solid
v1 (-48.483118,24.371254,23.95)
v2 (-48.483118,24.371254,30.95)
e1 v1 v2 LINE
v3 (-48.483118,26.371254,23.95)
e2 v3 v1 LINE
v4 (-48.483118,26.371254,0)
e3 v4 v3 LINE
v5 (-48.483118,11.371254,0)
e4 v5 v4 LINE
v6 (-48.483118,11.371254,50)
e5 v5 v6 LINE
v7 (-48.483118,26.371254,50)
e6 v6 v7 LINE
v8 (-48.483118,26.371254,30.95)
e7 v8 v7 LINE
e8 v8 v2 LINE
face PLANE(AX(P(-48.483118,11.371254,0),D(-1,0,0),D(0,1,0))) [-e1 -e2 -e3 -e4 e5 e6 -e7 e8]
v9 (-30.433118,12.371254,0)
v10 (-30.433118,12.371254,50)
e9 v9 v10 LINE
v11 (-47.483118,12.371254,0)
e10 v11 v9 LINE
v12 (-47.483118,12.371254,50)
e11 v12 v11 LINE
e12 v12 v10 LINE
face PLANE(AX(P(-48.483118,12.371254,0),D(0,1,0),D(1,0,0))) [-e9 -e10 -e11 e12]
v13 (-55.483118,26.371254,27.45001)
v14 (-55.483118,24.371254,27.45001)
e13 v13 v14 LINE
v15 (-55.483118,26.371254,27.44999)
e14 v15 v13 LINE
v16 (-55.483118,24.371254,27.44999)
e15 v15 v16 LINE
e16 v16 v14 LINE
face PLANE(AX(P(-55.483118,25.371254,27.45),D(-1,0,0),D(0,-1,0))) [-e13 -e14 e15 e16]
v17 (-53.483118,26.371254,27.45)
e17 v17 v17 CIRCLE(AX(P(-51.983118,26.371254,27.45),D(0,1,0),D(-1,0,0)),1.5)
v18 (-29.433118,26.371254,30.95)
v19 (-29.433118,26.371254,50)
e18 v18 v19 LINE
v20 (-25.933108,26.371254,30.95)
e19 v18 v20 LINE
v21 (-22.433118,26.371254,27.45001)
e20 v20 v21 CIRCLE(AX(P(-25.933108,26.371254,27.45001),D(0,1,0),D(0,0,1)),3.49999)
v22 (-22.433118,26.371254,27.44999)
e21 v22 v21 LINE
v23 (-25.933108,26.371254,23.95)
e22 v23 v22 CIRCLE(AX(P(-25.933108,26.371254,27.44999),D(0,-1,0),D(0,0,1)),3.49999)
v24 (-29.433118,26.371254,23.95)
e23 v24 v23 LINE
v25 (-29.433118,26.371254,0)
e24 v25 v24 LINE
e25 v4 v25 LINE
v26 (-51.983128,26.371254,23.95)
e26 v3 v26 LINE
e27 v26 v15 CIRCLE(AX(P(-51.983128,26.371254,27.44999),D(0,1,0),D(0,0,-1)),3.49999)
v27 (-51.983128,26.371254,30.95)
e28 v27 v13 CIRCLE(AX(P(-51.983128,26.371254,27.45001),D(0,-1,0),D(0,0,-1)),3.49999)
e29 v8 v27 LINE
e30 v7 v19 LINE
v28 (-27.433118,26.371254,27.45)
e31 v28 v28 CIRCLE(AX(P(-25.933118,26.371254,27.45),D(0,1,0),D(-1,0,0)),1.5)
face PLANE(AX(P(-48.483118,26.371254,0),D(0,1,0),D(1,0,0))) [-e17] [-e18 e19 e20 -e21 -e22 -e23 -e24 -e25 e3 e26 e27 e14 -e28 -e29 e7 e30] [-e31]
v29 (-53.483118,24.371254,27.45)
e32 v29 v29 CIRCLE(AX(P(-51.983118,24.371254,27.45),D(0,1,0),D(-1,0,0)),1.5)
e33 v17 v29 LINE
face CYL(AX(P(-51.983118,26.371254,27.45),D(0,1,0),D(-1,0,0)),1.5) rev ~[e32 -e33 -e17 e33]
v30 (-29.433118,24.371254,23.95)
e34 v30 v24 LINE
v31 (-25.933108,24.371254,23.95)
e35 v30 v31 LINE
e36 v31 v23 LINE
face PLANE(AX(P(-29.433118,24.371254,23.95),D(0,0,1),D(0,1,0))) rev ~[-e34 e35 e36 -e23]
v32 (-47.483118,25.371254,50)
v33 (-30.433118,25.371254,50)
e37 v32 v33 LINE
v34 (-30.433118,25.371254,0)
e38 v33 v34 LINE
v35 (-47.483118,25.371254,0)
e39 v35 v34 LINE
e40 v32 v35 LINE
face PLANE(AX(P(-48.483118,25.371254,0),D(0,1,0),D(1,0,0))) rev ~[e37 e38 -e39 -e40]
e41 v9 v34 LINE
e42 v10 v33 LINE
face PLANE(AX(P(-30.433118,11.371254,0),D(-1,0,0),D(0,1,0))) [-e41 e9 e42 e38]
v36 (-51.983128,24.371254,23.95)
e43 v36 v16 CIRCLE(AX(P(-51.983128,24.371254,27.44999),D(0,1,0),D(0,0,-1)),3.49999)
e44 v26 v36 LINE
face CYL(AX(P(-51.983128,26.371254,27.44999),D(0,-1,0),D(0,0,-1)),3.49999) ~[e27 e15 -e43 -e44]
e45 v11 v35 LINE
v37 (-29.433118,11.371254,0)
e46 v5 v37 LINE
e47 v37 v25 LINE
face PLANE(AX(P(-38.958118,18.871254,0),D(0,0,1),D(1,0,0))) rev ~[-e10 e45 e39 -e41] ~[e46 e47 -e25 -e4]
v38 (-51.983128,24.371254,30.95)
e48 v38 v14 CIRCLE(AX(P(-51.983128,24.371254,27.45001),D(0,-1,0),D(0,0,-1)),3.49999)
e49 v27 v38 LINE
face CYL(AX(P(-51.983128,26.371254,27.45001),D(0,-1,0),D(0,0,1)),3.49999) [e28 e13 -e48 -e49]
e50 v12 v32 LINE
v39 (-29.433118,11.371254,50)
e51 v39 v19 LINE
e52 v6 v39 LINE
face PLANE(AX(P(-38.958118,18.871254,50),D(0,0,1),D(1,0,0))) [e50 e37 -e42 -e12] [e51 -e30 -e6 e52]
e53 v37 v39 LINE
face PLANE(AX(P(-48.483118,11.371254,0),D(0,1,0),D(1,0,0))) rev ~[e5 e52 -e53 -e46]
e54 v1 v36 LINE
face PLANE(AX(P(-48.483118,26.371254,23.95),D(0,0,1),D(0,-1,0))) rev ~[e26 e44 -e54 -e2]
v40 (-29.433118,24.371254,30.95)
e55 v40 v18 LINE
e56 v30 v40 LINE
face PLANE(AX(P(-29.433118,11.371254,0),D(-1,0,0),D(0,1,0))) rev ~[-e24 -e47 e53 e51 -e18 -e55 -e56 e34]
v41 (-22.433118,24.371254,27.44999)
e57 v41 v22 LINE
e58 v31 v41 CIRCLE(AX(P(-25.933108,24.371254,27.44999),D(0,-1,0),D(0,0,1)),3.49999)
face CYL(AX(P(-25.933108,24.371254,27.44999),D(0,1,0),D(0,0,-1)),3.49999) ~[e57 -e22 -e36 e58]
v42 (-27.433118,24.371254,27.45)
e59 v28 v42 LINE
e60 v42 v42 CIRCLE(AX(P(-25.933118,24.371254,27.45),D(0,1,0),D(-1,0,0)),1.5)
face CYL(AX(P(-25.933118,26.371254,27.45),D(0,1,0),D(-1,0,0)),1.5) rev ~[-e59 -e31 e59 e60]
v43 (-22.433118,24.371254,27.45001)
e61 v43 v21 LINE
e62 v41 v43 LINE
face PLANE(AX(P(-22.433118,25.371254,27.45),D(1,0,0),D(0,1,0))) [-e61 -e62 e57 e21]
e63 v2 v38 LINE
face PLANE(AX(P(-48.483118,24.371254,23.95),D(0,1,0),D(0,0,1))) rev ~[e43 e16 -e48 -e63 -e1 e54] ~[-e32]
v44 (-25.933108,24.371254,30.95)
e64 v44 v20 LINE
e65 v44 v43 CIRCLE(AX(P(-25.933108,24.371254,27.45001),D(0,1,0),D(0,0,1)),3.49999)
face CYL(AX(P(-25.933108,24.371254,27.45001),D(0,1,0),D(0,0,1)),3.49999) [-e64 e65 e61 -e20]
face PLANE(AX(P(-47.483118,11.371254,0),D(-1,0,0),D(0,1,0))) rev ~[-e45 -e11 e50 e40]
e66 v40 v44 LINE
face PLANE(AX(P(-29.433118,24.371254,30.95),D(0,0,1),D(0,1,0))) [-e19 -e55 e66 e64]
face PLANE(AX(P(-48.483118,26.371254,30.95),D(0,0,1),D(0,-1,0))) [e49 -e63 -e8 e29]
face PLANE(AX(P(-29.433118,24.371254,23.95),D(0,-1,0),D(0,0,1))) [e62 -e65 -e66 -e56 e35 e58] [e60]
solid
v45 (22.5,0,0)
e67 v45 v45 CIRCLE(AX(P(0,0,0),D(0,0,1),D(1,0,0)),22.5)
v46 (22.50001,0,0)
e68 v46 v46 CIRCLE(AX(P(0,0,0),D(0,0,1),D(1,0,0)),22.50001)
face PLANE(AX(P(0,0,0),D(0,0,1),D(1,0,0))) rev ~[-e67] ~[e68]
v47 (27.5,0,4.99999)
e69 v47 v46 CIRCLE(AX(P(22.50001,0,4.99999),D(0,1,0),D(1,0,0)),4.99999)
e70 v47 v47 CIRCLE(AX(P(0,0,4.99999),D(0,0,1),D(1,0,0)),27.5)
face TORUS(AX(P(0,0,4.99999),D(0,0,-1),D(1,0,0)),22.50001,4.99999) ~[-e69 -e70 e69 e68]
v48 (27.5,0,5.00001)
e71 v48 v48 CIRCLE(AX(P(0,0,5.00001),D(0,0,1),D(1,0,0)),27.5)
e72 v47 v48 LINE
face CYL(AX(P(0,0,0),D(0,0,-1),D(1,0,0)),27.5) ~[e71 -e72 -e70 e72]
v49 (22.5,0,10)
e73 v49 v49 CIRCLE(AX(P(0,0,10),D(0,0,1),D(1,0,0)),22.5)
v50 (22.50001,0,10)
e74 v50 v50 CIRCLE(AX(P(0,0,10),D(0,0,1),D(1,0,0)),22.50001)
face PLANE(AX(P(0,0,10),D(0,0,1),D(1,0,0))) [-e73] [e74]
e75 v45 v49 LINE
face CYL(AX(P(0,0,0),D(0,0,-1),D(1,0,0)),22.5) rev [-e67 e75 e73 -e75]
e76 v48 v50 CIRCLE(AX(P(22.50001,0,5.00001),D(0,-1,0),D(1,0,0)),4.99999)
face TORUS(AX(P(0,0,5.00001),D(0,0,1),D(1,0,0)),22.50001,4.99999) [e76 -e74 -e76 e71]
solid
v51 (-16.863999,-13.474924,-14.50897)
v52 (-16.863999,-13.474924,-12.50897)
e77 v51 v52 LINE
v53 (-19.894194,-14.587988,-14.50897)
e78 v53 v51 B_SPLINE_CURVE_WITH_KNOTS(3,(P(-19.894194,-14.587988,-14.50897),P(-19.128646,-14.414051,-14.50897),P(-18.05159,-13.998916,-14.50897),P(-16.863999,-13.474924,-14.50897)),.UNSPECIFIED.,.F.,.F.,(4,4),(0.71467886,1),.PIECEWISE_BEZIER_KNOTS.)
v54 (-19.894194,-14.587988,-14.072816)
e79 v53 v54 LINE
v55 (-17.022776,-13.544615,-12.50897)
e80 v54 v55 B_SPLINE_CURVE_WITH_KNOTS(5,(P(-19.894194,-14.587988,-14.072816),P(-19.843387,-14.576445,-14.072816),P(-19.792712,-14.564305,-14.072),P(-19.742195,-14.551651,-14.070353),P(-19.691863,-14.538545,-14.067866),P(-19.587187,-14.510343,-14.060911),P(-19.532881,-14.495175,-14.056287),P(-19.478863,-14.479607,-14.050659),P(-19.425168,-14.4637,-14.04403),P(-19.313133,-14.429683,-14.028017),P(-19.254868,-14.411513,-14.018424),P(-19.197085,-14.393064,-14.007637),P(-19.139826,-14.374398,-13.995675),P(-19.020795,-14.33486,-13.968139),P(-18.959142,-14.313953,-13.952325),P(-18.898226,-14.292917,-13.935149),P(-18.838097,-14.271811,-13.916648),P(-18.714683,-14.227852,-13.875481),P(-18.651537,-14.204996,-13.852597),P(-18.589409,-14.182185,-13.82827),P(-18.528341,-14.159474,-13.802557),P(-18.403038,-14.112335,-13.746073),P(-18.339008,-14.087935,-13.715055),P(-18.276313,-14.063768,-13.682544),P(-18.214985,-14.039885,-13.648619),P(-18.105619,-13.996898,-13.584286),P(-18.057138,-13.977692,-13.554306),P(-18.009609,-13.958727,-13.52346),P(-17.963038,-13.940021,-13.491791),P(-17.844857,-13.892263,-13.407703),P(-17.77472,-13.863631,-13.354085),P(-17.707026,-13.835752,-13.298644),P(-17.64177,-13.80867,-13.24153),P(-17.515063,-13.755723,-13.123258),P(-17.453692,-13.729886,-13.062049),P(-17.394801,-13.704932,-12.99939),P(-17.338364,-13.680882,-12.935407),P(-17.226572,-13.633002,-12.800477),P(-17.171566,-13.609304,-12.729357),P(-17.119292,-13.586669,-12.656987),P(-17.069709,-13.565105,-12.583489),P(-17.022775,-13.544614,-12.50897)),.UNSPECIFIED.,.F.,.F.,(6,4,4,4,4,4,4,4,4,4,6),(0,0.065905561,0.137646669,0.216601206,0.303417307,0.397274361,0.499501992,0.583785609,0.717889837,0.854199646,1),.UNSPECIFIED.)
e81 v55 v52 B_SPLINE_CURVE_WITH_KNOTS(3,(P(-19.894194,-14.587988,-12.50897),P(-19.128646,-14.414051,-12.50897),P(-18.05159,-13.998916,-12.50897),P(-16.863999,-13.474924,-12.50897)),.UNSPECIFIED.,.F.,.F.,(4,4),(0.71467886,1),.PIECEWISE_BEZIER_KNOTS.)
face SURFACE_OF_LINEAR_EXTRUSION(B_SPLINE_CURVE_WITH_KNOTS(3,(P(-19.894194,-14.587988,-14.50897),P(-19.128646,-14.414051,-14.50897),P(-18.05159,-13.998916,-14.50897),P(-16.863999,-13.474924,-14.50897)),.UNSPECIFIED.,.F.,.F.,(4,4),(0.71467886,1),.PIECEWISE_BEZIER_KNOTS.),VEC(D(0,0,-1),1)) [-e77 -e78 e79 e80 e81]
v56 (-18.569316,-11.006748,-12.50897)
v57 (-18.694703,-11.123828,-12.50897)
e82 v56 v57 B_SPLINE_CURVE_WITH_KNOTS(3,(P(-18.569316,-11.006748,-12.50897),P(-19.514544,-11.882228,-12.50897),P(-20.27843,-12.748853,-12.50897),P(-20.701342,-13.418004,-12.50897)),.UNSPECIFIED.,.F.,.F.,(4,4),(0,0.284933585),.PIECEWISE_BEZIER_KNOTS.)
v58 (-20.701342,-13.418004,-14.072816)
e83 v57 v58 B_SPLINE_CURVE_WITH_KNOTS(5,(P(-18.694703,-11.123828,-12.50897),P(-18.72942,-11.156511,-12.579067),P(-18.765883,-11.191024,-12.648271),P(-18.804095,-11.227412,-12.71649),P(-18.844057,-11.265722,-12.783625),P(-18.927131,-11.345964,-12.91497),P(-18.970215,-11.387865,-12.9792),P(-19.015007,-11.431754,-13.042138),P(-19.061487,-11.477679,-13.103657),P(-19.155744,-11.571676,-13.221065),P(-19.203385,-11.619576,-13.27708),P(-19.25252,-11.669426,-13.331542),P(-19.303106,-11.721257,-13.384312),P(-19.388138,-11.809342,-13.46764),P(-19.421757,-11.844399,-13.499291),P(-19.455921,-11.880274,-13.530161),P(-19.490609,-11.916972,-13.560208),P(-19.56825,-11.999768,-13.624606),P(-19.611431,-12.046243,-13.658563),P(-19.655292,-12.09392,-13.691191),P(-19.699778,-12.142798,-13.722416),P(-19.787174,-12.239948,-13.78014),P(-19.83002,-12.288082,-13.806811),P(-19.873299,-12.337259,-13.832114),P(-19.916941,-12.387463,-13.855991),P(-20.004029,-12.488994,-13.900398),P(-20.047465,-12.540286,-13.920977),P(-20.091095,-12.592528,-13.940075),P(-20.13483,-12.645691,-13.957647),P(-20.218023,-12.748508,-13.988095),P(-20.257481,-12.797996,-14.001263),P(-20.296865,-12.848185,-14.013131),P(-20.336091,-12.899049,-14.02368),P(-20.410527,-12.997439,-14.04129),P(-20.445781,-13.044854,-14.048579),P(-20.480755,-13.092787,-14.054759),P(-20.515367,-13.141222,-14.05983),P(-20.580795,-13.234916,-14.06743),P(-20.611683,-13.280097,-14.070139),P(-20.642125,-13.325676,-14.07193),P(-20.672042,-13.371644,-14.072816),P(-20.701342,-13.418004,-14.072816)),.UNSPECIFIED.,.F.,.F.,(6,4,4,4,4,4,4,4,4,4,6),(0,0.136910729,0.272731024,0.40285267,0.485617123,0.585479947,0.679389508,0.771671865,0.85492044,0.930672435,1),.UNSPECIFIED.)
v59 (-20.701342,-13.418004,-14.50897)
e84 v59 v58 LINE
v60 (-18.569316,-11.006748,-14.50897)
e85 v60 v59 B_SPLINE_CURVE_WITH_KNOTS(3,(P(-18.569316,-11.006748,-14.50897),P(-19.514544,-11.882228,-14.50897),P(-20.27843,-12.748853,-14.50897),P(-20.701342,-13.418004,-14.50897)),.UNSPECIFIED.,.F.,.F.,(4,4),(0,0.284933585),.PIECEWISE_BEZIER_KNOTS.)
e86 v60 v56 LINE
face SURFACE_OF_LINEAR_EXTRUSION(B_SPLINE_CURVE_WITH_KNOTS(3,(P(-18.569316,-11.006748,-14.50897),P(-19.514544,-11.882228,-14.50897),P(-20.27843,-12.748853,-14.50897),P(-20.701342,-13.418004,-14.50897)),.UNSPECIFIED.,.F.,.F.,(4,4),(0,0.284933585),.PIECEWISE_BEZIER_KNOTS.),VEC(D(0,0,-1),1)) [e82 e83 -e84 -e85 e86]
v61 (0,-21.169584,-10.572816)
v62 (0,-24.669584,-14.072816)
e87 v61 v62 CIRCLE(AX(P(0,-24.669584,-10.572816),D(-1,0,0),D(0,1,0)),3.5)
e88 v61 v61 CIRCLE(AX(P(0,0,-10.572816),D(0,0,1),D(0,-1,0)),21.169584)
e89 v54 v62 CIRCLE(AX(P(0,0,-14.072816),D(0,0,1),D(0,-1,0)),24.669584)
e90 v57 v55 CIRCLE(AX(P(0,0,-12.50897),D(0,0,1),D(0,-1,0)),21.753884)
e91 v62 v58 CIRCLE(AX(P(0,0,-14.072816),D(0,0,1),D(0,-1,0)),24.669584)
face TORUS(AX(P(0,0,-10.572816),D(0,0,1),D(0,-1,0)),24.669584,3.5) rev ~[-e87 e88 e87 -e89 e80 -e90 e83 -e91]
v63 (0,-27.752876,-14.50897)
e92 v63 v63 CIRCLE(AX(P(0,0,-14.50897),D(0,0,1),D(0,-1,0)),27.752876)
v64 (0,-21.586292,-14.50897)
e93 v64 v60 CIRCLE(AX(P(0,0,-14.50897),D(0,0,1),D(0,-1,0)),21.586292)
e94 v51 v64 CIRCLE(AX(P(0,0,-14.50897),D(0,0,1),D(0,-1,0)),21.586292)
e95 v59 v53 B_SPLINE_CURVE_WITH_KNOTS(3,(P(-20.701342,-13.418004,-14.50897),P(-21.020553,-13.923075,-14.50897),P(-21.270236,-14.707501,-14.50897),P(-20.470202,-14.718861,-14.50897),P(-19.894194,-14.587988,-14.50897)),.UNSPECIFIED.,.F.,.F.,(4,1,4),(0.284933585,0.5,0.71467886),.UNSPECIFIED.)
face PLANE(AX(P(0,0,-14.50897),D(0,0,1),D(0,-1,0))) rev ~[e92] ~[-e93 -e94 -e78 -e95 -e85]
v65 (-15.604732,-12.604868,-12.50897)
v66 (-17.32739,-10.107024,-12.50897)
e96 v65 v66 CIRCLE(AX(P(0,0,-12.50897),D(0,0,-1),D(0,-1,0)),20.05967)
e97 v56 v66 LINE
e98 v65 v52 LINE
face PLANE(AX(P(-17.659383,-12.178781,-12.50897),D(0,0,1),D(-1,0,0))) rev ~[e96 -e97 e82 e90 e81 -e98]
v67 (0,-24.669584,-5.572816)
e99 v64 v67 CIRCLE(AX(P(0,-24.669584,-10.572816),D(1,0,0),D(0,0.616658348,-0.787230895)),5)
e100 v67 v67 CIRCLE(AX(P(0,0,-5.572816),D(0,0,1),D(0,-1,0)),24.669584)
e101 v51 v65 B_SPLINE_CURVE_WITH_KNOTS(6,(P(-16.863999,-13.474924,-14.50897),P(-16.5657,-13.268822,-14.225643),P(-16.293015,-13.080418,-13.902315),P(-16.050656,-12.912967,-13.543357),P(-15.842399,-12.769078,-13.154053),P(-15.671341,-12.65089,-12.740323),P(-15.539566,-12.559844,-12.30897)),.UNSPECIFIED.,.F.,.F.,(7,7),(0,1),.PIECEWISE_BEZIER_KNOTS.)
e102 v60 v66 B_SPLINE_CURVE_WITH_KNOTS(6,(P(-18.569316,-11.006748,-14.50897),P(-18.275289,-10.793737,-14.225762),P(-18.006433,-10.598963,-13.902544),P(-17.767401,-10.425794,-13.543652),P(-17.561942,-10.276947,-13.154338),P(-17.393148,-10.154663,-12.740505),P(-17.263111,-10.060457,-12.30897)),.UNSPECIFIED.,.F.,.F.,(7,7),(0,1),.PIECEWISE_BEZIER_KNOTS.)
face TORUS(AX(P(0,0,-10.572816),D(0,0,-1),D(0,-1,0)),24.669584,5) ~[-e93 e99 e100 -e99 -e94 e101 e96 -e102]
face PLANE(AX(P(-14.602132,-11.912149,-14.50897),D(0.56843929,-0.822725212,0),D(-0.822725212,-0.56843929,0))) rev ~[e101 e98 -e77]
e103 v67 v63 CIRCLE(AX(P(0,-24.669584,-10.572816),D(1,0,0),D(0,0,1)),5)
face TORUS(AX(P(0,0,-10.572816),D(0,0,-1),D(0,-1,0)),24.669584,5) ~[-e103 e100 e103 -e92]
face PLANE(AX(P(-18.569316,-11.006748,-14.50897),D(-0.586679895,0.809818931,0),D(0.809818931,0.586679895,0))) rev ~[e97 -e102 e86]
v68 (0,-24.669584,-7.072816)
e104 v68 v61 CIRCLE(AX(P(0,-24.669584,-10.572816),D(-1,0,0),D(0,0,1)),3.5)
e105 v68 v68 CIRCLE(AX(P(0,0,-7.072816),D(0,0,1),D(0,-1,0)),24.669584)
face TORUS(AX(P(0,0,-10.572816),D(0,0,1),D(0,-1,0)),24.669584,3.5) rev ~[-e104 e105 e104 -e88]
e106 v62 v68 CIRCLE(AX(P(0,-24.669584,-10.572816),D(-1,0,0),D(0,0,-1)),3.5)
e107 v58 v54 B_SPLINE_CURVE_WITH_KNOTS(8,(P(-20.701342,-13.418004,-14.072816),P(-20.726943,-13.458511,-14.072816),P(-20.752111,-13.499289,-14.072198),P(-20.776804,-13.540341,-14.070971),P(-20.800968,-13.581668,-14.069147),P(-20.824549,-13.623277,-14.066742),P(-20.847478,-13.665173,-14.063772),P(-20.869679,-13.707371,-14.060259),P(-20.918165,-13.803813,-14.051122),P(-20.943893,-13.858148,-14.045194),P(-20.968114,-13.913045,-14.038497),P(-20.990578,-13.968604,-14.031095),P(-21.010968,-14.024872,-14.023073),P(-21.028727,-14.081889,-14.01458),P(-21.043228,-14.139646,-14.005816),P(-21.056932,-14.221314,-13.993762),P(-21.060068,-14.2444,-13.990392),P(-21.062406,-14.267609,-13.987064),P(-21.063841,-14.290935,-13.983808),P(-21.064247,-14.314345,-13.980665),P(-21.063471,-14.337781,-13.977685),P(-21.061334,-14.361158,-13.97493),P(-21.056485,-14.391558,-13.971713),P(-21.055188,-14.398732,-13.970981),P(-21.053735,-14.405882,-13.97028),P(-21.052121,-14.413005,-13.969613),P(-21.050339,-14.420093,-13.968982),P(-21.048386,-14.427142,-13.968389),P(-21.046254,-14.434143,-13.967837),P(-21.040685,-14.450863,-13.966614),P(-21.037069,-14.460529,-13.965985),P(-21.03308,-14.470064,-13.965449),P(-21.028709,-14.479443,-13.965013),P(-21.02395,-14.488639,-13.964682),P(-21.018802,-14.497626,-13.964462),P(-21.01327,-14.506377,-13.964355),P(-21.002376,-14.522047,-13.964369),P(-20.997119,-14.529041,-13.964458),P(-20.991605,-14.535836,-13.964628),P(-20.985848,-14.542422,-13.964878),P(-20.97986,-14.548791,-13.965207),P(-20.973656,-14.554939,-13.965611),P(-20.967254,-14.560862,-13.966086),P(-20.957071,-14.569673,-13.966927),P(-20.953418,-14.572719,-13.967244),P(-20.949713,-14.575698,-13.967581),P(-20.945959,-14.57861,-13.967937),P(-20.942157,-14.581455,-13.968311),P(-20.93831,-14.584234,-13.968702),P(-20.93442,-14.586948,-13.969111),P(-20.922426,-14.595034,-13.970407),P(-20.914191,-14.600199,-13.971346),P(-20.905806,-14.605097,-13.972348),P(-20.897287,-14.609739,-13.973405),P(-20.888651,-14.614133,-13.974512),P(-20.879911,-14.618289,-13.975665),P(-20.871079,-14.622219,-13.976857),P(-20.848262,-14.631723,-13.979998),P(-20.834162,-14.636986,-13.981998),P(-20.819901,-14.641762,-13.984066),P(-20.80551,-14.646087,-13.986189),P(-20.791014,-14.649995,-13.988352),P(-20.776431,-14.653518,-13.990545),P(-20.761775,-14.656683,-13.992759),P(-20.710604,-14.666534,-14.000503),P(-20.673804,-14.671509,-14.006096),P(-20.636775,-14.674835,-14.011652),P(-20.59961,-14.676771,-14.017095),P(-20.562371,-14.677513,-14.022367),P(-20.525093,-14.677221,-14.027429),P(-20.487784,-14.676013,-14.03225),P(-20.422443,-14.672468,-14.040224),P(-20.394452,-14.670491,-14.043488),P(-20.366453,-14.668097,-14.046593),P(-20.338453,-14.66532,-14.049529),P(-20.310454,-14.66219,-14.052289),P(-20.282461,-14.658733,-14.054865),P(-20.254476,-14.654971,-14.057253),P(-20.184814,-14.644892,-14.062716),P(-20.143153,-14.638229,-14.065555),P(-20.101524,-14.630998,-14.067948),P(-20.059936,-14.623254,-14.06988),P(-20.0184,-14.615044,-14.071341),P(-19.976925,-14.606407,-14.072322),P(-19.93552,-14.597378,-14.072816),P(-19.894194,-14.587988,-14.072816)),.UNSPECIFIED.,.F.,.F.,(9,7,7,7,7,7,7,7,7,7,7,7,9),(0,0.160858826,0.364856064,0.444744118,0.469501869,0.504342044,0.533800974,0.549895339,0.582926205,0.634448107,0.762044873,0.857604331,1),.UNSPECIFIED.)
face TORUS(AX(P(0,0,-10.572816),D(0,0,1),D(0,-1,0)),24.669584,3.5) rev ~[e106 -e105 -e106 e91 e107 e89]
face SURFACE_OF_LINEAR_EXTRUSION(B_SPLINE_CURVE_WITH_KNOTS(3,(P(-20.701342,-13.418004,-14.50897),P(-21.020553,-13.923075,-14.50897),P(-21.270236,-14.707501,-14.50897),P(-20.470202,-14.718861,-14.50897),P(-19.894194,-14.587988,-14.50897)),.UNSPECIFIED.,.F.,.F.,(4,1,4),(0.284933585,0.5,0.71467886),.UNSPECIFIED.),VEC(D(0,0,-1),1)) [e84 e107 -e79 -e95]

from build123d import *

# Parameters (mm, degrees)
F0_W      = 19.05
F0_H      = 15
F1_DEPTH  = 50
F2_T      = -1
F3_W      = 2
F3_H      = 7
F4_DEPTH  = 7
F5_R      = 3.49999
F6_W      = 2
F6_H      = 7
F7_DEPTH  = 7
F8_R      = 3.49999
F9_R      = 1.5
F10_DEPTH = 25
F11_R     = 27.5
F11_R_2   = 22.5
F12_DEPTH = 10
F13_R     = 4.99999
F18_DEPTH = 2


# Not quite as in the source:
# - a fillet or chamfer is up to 0.001 mm smaller than in the source, because OpenCascade refuses the exact size


with BuildPart() as f1:
    # F0 (on Top) → F1 (new body)
    with BuildSketch(Plane.XY):
        with Locations((-38.9581184149, 18.8712536544)):
            Rectangle(F0_W, F0_H)
    extrude(amount=F1_DEPTH)

    # F2
    f2_openings = [f1.faces().sort_by_distance(p)[0] for p in [
        (-38.958118, 18.871254, 50),
        (-38.958118, 18.871254, 0),
    ]]
    offset(amount=F2_T, openings=f2_openings)

    # F3 (on face) → F4 (join)
    with BuildSketch(Plane(origin=(-48.4831184149, 0, 0), x_dir=(0, -1, 0), z_dir=(-1, 0, 0))):
        with Locations((-25.3712536544, 27.45)):
            Rectangle(F3_W, F3_H)
    extrude(amount=F4_DEPTH)

    # F5 (radius 3.5 in the source; OpenCascade refuses exactly that, so slightly less here)
    f5_edges = [f1.edges().sort_by_distance(p)[0] for p in [
        (-55.483118, 25.371254, 30.95),
        (-55.483118, 25.371254, 23.95),
    ]]
    fillet(f5_edges, radius=F5_R)

    # F6 (on face) → F7 (join)
    with BuildSketch(Plane.YZ.offset(-29.4331184149)):
        with Locations((25.3712536544, 27.45)):
            Rectangle(F6_W, F6_H)
    extrude(amount=F7_DEPTH)

    # F8 (radius 3.5 in the source; OpenCascade refuses exactly that, so slightly less here)
    f8_edges = [f1.edges().sort_by_distance(p)[0] for p in [
        (-22.433118, 25.371254, 30.95),
        (-22.433118, 25.371254, 23.95),
    ]]
    fillet(f8_edges, radius=F8_R)

    # F9 (on face) → F10 (cut)
    with BuildSketch(Plane(origin=(0, 26.3712536544, 0), x_dir=(-1, 0, 0), z_dir=(0, 1, 0))):
        with Locations((25.9331184149, 27.45)):
            Circle(F9_R)
        with Locations((51.9831184149, 27.45)):
            Circle(F9_R)
    extrude(amount=-F10_DEPTH, mode=Mode.SUBTRACT)


with BuildPart() as f12:
    # F11 (on Top) → F12 (new body)
    with BuildSketch(Plane.XY):
        Circle(F11_R)
        Circle(F11_R_2, mode=Mode.SUBTRACT)
    extrude(amount=F12_DEPTH)

    # F13 (radius 5 in the source; OpenCascade refuses exactly that, so slightly less here)
    f13_edges = [f12.edges().sort_by_distance(p)[0] for p in [
        (-27.5, 0, 10),
        (-27.5, 0, 0),
    ]]
    fillet(f13_edges, radius=F13_R)


with BuildPart() as f16:
    # F14 (on Right) → F16 (revolve)
    with BuildSketch(Plane.YZ):
        with BuildLine():
            ThreePointArc((-21.586292201, -14.5089704435), (-19.94302217, -8.9419837234), (-24.6695839419, -5.5728159699))
            ThreePointArc((-24.6695839419, -5.5728159699), (-29.3961457139, -8.9419837234), (-27.7528756829, -14.5089704435))
            Line((-27.7528756829, -14.5089704435), (-24.6695839419, -14.5089704435))
            Line((-24.6695839419, -14.5089704435), (-21.586292201, -14.5089704435))
        make_face()
        with BuildLine():
            ThreePointArc((-24.6695839419, -14.0728159699), (-28.1695839419, -10.5728159699), (-24.6695839419, -7.0728159699))
            ThreePointArc((-24.6695839419, -7.0728159699), (-22.1947102078, -8.0979422357), (-21.1695839419, -10.5728159699))
            ThreePointArc((-21.1695839419, -10.5728159699), (-22.1947102078, -13.047689704), (-24.6695839419, -14.0728159699))
        make_face(mode=Mode.SUBTRACT)
    revolve(axis=Axis((0, 0, 0), (0, 0, 1)))

    # F17 (on face) → F18 (cut)
    with BuildSketch(Plane(origin=(0, 0, -14.5089704435), x_dir=(1, 0, 0), z_dir=(0, 0, -1))):
        with BuildLine():
            add(Edge.make_bspline(
                [(-18.5693163885, 11.0067479234), (-19.5145440214, 11.8822279008), (-20.2784297379, 12.748853493), (-20.7013416556, 13.4180037833)],
                knots=[0, 0, 0, 0, 0.2849335845, 0.2849335845, 0.2849335845, 0.2849335845], degree=3))
            Line((-18.5693163885, 11.0067479234), (-16.3423760275, 9.3934229103))
            Line((-16.3423760275, 9.3934229103), (-14.6021316763, 11.9121490585))
            Line((-14.6021316763, 11.9121490585), (-16.8639985197, 13.4749235587))
            add(Edge.make_bspline(
                [(-19.8941943816, 14.5879882704), (-19.1286458444, 14.4140509933), (-18.0515904183, 13.998916464), (-16.8639985197, 13.4749235587)],
                knots=[0.7146788605, 0.7146788605, 0.7146788605, 0.7146788605, 1, 1, 1, 1], degree=3))
            ThreePointArc((-19.8941943816, 14.5879882704), (-20.3061961593, 14.0088104209), (-20.7013416556, 13.4180037833))
        make_face()
        with BuildLine():
            add(Edge.make_bspline(
                [(-20.7013416556, 13.4180037833), (-21.0205534128, 13.9230750074), (-21.2702357528, 14.7075006253), (-20.4702017813, 14.7188606498), (-19.8941943816, 14.5879882704)],
                knots=[0.2849335845, 0.2849335845, 0.2849335845, 0.2849335845, 0.5, 0.7146788605, 0.7146788605, 0.7146788605, 0.7146788605], degree=3))
            ThreePointArc((-20.7013416556, 13.4180037833), (-20.3061961593, 14.0088104209), (-19.8941943816, 14.5879882704))
        make_face()
    extrude(amount=-F18_DEPTH, mode=Mode.SUBTRACT)


solid = Compound([f1.part, f12.part, f16.part])
